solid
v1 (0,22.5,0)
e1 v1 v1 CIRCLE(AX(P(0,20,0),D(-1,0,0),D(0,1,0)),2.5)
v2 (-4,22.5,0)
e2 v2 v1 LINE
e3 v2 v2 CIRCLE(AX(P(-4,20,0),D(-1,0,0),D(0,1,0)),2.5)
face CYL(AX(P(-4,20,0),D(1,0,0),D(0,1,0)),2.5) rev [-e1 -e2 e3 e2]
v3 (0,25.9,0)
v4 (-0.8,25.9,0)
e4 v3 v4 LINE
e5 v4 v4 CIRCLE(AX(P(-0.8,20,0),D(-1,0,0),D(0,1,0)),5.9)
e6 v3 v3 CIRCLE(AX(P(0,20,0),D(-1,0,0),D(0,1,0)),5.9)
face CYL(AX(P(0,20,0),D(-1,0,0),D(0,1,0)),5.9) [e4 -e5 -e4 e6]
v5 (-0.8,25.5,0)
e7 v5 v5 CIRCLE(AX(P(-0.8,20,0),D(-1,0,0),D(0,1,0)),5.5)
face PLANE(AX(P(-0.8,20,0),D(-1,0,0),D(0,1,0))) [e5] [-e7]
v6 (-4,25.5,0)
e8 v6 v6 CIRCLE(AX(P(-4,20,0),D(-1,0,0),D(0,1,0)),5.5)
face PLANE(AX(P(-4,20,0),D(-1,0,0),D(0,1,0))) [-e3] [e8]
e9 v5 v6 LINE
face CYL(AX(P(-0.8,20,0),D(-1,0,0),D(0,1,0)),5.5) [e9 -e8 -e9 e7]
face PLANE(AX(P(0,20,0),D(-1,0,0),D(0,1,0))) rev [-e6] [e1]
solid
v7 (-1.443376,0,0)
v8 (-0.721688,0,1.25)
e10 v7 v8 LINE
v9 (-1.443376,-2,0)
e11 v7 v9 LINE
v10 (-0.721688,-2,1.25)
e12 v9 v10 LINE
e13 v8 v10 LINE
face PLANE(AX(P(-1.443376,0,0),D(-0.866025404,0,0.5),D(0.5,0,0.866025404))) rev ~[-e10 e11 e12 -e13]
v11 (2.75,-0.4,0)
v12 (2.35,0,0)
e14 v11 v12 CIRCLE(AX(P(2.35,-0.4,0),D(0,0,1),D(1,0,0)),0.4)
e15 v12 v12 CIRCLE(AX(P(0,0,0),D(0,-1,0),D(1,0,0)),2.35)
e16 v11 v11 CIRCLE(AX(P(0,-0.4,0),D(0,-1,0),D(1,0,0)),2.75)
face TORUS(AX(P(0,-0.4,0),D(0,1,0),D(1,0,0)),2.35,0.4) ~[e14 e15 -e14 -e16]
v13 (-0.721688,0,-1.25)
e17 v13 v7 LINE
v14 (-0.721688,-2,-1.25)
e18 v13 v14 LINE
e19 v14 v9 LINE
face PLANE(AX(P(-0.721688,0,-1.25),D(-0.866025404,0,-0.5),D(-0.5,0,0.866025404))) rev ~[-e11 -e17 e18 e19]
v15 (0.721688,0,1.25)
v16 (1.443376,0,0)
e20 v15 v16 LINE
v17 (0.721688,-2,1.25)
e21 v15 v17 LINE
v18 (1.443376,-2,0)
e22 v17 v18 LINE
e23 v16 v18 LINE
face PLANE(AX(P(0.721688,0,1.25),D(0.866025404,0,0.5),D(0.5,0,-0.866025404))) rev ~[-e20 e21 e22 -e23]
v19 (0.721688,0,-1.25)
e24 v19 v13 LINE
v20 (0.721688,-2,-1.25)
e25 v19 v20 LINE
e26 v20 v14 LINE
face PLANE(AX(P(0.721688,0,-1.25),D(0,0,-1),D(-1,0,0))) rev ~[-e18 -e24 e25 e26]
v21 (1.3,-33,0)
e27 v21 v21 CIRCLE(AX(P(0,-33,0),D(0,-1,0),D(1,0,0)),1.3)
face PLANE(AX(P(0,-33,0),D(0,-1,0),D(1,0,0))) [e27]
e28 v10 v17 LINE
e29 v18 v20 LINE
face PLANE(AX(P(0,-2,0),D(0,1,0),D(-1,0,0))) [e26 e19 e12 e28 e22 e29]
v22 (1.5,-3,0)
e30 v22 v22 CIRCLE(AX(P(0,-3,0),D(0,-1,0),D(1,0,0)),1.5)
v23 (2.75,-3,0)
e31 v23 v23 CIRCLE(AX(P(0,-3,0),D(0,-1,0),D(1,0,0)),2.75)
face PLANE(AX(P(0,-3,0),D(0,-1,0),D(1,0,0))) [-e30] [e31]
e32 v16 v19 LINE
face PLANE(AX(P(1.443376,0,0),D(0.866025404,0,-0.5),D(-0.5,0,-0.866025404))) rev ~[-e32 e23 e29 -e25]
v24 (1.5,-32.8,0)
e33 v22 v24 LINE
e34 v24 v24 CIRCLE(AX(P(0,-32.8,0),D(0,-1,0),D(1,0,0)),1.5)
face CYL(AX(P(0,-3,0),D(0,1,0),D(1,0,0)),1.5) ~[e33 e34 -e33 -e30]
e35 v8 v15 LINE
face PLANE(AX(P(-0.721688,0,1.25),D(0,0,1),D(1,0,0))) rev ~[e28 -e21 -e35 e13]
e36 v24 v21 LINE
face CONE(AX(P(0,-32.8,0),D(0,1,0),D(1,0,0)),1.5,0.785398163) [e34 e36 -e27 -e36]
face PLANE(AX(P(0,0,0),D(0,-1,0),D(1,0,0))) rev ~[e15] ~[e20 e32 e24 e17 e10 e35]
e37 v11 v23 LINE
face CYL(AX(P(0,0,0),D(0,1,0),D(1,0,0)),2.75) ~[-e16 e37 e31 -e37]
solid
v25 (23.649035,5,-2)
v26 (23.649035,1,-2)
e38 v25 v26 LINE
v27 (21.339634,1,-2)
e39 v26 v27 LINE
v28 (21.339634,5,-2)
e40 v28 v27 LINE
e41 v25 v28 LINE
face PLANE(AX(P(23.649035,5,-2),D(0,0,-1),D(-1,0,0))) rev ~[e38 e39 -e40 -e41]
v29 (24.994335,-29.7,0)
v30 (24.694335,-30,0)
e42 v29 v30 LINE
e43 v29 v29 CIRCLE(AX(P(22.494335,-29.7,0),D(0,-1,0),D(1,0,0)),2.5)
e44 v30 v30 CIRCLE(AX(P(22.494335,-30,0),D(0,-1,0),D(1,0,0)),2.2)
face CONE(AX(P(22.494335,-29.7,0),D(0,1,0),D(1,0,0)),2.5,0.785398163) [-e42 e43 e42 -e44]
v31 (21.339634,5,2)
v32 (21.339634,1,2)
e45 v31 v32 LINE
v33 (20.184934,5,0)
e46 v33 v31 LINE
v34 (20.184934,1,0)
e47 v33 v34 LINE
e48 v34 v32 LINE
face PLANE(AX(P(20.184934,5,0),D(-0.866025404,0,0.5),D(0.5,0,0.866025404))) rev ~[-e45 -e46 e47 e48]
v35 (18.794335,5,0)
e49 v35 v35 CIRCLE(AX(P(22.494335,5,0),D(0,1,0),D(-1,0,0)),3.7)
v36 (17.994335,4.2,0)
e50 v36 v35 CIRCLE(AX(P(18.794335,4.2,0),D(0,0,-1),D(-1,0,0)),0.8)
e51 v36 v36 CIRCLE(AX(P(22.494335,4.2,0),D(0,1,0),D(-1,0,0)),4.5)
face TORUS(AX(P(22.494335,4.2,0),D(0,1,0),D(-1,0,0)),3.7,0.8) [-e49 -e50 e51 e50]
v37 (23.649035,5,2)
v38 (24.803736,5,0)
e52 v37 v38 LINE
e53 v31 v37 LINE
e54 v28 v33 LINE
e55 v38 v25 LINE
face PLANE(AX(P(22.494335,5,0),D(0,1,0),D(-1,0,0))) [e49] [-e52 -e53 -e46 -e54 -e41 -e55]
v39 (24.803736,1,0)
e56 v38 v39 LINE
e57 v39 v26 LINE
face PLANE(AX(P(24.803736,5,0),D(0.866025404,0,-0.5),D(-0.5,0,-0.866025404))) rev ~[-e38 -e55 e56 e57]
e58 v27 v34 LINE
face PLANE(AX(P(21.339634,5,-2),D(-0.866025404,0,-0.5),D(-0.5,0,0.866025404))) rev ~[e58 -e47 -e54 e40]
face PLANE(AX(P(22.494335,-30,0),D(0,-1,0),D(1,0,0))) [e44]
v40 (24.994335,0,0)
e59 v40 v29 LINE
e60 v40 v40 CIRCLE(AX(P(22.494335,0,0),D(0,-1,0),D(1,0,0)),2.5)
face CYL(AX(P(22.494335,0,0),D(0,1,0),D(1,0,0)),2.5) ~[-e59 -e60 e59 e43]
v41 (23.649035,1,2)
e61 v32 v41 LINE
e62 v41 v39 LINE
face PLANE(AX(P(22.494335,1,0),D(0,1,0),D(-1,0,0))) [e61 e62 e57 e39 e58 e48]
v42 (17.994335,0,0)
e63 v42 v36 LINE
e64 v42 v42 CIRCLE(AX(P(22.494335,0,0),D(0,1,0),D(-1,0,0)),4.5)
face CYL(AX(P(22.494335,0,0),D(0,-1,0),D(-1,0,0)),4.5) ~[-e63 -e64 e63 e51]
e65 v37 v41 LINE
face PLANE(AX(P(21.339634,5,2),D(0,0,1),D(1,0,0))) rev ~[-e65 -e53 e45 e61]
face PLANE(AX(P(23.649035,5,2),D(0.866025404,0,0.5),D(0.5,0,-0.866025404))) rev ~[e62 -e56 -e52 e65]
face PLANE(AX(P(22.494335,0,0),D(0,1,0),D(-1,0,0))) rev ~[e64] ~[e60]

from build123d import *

# Parameters (mm, degrees)
F0_R      = 2.75
F1_DEPTH  = 3
F2_R      = 1.5
F3_DEPTH  = 30
F4_SIZE   = 0.2
F6_DEPTH  = 2
F7_R      = 0.4
F8_R      = 2.5
F9_DEPTH  = 30
F10_R     = 4.5
F10_R_2   = 2.5
F11_DEPTH = 5
F12_R     = 0.8
F13_SIZE  = 0.3
F15_DEPTH = 4


with BuildPart() as f1:
    # F0 (on Front) → F1 (new body)
    with BuildSketch(Plane.XZ):
        Circle(F0_R)
    extrude(amount=F1_DEPTH)

    # F2 (on face) → F3 (join)
    with BuildSketch(Plane.XZ.offset(3)):
        Circle(F2_R)
    extrude(amount=F3_DEPTH)

    # F4
    f4_edges = [f1.edges().sort_by_distance(p)[0] for p in [
        (-1.5, -33, 0),
    ]]
    chamfer(f4_edges, length=F4_SIZE)

    # F5 (on face) → F6 (cut)
    with BuildSketch(Plane(origin=(0, 0, 0), x_dir=(-1, 0, 0), z_dir=(0, 1, 0))):
        Polygon((1.443375673, 0), (0.7216878365, 1.25), (-0.7216878365, 1.25), (-1.443375673, 0), (-0.7216878365, -1.25), (0.7216878365, -1.25), align=None)
    extrude(amount=-F6_DEPTH, mode=Mode.SUBTRACT)

    # F7
    f7_edges = [f1.edges().sort_by_distance(p)[0] for p in [
        (-2.75, 0, 0),
    ]]
    fillet(f7_edges, radius=F7_R)


with BuildPart() as f9:
    # F8 (on Front) → F9 (new body)
    with BuildSketch(Plane.XZ):
        with Locations((22.4943347275, 0)):
            Circle(F8_R)
    extrude(amount=F9_DEPTH)

    # F10 (on face) → F11 (join)
    with BuildSketch(Plane(origin=(0, 0, 0), x_dir=(-1, 0, 0), z_dir=(0, 1, 0))):
        with Locations((-22.4943347275, 0)):
            Circle(F10_R)
        with Locations((-22.4943347275, 0)):
            Circle(F10_R_2, mode=Mode.SUBTRACT)
        with Locations((-22.4943347275, 0)):
            Circle(F10_R_2)
    extrude(amount=F11_DEPTH)

    # F12
    f12_edges = [f9.edges().sort_by_distance(p)[0] for p in [
        (26.994335, 5, 0),
    ]]
    fillet(f12_edges, radius=F12_R)

    # F13
    f13_edges = [f9.edges().sort_by_distance(p)[0] for p in [
        (19.994335, -30, 0),
    ]]
    chamfer(f13_edges, length=F13_SIZE)

    # F14 (on face) → F15 (cut)
    with BuildSketch(Plane(origin=(0, 5, 0), x_dir=(-1, 0, 0), z_dir=(0, 1, 0))):
        Polygon((-23.6490352659, -2), (-21.3396341891, -2), (-20.1849336508, 0), (-21.3396341891, 2), (-23.6490352659, 2), (-24.8037358043, 0), align=None)
    extrude(amount=-F15_DEPTH, mode=Mode.SUBTRACT)


with BuildPart() as f17:
    # F16 (on Top) → F17 (revolve)
    with BuildSketch(Plane.XY):
        Polygon((0, 22.5), (0, 25.9), (-0.8, 25.9), (-0.8, 25.5), (-4, 25.5), (-4, 22.5), align=None)
    revolve(axis=Axis((-6.1384743312, 20, 0), (-1, 0, 0)))


solid = Compound([f1.part, f9.part, f17.part])
